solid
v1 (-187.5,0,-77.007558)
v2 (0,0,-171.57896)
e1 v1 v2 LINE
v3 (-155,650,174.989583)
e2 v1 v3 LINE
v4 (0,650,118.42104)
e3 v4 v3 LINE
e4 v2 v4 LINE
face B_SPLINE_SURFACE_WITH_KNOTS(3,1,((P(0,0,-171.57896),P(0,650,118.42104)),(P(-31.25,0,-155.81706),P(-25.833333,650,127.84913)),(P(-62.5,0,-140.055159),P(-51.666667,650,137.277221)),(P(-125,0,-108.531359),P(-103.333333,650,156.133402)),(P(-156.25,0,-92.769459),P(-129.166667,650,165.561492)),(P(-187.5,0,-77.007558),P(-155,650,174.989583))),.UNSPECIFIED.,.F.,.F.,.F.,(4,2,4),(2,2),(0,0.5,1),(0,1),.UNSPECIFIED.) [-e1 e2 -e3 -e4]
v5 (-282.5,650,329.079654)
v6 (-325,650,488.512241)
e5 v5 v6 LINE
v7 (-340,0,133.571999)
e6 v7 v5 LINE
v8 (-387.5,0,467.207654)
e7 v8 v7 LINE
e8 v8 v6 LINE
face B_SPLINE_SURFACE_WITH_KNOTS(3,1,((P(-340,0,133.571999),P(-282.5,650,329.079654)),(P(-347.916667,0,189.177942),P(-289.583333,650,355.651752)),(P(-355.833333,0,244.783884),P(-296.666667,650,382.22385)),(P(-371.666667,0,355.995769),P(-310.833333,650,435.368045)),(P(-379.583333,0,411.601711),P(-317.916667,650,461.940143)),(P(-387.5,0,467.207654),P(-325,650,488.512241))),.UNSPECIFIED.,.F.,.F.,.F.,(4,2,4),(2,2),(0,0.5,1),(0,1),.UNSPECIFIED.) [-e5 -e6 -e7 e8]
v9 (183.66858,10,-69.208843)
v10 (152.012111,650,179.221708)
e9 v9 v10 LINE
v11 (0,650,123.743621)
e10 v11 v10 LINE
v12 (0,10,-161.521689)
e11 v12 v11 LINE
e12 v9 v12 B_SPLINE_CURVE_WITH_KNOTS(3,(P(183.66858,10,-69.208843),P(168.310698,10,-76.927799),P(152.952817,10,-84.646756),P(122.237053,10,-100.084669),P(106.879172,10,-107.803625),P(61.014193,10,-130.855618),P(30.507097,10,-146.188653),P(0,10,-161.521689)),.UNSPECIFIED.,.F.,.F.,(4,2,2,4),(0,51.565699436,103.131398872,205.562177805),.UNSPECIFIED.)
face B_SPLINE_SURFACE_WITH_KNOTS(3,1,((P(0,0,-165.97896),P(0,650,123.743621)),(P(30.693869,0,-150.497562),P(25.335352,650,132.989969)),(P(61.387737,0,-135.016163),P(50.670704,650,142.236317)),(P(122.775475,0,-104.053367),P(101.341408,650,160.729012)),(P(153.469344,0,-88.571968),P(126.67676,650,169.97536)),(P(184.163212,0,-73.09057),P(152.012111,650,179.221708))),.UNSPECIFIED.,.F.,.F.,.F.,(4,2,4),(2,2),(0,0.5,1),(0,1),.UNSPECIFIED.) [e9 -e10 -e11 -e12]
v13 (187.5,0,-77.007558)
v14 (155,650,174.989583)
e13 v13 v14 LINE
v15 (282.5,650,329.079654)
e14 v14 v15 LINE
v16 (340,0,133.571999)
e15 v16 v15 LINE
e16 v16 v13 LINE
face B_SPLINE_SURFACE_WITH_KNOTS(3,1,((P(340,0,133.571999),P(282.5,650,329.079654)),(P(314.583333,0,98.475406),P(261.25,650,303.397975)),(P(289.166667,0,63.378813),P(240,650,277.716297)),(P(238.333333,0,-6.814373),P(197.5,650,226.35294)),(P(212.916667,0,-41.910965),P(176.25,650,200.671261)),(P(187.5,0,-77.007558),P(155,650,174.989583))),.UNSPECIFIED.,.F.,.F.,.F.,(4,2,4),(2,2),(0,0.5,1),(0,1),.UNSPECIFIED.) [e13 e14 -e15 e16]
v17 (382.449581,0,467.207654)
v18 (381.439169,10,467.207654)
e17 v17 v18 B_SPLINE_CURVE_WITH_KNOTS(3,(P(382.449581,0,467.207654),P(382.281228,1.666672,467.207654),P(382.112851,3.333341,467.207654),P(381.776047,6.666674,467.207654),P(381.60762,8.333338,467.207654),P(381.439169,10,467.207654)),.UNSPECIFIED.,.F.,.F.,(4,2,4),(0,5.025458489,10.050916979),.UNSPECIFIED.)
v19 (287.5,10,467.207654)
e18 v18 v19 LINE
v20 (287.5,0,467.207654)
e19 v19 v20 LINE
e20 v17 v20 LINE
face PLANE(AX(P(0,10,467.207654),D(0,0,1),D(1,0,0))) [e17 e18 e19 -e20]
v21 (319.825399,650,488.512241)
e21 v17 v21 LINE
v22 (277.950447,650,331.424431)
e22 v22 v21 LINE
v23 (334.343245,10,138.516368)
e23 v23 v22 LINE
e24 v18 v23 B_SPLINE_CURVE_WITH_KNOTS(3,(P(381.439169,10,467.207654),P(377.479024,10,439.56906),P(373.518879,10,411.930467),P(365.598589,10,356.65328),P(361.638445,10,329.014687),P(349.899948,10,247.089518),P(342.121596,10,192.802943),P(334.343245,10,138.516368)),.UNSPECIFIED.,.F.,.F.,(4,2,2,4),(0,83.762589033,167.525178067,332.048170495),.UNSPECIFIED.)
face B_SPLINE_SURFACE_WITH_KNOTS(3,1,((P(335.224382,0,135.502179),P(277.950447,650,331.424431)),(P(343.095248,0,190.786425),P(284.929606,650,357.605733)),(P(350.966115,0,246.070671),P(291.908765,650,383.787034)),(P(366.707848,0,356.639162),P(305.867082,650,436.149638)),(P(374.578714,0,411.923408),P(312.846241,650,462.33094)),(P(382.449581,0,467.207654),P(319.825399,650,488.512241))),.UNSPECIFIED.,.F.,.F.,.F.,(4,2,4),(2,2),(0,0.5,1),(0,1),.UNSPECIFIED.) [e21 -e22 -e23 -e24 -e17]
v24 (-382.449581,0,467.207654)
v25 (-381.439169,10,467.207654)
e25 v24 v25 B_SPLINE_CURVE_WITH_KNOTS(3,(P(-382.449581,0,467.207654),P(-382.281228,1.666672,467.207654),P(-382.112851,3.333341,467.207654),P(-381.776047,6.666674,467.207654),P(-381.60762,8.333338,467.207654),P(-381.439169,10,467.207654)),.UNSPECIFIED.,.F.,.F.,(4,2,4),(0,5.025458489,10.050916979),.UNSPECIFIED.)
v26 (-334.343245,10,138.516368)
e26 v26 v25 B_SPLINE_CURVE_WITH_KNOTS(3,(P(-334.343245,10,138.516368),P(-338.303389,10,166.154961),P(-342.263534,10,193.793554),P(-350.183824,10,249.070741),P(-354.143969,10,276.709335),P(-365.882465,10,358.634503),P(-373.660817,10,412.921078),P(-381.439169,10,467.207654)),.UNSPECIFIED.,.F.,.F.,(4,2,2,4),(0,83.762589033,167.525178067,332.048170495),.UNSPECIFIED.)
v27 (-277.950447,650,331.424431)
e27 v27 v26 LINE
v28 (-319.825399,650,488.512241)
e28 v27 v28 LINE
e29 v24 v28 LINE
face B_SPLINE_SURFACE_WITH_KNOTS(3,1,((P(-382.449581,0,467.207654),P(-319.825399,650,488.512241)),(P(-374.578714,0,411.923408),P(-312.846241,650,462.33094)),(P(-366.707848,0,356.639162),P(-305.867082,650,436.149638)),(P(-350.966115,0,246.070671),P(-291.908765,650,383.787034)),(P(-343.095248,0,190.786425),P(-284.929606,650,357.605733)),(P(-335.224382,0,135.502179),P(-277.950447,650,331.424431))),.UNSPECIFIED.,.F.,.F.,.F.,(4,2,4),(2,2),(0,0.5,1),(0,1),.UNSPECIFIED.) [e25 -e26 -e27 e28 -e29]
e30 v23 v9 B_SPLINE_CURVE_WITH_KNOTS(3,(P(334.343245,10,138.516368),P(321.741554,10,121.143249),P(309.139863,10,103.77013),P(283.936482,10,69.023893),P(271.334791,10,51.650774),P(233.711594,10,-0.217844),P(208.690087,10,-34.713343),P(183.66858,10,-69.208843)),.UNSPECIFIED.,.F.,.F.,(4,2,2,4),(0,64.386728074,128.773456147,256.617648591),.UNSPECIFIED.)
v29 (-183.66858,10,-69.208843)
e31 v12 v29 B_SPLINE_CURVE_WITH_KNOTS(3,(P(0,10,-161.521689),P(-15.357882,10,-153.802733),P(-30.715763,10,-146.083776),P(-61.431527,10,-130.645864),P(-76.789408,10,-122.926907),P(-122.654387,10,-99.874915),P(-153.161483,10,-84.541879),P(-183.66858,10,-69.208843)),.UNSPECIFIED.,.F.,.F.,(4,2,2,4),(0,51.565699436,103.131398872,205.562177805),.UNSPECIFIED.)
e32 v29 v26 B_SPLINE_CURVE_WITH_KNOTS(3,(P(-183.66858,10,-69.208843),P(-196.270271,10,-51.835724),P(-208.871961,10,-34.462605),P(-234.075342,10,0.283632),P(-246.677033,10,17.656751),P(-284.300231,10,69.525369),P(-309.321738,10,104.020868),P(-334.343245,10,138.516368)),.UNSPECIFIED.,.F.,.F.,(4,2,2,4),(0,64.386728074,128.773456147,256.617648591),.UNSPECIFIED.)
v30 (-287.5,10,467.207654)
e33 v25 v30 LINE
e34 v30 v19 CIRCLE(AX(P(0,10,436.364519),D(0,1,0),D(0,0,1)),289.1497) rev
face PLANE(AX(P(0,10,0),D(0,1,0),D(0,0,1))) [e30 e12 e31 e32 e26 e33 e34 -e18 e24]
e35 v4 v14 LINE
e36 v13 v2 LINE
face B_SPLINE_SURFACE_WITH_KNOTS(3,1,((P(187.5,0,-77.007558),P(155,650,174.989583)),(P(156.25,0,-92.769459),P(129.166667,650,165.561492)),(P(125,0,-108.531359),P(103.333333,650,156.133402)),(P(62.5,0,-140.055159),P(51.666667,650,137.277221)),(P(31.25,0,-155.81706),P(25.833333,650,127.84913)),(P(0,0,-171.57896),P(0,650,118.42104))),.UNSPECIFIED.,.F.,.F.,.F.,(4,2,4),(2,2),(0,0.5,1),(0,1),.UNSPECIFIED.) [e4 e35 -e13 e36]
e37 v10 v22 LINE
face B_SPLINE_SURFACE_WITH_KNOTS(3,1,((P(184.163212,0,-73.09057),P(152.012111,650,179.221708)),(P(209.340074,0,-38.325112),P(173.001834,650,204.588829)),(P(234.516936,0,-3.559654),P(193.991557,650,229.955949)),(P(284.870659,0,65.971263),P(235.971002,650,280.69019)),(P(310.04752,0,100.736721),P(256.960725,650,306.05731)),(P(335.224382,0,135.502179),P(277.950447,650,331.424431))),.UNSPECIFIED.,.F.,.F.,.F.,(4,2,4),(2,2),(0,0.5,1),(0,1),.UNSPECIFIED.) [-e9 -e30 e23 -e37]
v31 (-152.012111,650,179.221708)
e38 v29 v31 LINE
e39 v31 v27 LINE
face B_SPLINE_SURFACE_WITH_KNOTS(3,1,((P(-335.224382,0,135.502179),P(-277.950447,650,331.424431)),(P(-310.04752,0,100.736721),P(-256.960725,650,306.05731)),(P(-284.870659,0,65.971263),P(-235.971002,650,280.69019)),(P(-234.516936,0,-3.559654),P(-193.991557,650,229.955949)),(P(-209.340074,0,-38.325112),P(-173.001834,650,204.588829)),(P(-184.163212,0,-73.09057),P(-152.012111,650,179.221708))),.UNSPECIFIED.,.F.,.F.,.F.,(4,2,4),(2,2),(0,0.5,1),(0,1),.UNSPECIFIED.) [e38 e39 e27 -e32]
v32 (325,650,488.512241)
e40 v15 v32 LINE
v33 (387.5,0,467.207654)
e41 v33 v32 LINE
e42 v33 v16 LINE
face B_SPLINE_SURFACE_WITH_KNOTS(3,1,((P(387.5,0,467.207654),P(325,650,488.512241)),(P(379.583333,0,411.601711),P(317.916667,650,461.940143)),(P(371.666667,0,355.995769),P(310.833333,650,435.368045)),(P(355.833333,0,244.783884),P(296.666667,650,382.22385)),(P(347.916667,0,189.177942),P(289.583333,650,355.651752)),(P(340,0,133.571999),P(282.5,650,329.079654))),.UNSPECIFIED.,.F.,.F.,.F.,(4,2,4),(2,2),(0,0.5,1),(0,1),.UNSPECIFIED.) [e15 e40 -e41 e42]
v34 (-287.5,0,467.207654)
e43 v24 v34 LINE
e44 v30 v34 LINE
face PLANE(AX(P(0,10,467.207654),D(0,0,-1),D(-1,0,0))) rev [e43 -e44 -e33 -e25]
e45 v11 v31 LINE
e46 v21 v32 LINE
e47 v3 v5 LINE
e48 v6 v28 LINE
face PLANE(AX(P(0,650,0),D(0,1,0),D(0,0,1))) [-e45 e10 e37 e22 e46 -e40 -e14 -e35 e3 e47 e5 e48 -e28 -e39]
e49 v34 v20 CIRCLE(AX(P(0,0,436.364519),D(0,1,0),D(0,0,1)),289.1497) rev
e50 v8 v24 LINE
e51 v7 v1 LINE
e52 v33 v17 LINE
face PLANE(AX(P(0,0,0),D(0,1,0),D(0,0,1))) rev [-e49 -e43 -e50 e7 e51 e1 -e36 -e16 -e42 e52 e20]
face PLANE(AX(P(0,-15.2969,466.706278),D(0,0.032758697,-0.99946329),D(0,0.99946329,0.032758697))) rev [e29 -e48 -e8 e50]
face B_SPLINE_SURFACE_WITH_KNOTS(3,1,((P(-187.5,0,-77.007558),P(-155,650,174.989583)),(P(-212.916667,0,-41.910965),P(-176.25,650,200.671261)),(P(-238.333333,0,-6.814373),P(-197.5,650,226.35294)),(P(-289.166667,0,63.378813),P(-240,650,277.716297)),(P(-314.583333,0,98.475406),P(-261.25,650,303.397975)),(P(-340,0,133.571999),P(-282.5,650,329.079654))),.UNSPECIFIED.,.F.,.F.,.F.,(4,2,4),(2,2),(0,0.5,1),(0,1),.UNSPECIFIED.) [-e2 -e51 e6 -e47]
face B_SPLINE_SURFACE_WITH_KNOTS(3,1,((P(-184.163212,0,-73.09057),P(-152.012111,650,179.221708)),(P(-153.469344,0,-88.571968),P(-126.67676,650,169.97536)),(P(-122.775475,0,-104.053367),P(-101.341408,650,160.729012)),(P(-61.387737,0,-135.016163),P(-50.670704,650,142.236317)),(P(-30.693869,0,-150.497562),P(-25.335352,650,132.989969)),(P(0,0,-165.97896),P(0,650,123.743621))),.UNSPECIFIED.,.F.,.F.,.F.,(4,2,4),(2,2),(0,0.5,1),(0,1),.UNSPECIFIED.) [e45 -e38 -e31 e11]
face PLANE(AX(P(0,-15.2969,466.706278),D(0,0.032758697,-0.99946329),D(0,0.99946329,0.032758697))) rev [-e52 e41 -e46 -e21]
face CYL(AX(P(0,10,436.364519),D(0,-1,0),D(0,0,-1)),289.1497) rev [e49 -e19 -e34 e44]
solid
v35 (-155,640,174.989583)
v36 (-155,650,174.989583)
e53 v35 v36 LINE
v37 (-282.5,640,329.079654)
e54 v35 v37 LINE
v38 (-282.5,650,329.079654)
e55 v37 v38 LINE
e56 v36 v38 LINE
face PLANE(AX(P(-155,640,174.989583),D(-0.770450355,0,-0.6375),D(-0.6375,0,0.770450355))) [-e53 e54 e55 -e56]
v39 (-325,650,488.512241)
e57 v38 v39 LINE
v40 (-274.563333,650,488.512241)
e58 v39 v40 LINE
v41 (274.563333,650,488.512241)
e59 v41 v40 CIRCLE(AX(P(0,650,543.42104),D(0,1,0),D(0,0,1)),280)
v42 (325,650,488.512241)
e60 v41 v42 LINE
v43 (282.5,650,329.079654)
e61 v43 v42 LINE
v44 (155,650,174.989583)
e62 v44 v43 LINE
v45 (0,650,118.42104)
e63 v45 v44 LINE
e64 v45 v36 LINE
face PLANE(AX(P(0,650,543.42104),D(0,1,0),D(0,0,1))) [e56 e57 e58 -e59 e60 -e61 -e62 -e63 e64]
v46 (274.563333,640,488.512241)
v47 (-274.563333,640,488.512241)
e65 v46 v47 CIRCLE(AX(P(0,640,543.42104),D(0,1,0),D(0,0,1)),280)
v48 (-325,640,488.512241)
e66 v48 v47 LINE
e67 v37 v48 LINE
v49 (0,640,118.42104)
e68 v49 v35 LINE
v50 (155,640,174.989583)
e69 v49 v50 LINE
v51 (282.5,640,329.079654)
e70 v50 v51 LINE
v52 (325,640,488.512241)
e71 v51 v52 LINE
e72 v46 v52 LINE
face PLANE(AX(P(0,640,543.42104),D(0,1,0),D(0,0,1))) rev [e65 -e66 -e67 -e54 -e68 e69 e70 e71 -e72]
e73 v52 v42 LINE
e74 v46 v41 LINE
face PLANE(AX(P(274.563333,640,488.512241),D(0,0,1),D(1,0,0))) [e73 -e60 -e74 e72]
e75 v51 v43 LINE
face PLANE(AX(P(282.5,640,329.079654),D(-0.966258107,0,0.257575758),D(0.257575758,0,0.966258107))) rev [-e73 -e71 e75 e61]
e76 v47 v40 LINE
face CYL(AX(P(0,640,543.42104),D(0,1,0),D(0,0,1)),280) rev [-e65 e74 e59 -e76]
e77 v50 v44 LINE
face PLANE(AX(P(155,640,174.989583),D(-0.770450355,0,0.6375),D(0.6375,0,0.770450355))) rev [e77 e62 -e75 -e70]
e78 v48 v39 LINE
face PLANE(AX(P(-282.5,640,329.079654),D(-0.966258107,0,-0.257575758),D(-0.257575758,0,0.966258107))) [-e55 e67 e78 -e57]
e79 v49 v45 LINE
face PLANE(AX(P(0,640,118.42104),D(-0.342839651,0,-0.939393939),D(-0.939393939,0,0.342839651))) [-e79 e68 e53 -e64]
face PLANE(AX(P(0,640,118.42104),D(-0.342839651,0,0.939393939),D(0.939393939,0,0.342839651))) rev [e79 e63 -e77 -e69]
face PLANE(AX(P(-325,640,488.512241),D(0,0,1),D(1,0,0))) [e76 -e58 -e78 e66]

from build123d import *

# Parameters (mm, degrees)
BOSS_EXTRUDE1_DEPTH = 10
BOSS_EXTRUDE2_DEPTH = 10


with BuildPart() as part:
    # Loft2: read off the stored shape, not the designer's step
    # Loft2: loft between two sections, ruled curve by curve
    loft2_from = [
        Edge.make_bspline([(-335.224381982, 0, 135.502179225), (-310.047520364, 0, 100.736721017), (-284.870658745, 0, 65.97126281), (-234.516935508, 0, -3.559653606), (-209.34007389, 0, -38.325111813), (-184.163212271, 0, -73.090570021)], [0, 0, 0, 0, 0.5, 0.5, 1, 1, 1, 1], 3),
        Edge.make_bspline([(-184.163212271, 0, -73.090570021), (-153.469343559, 0, -88.571968338), (-122.775474847, 0, -104.053366656), (-61.387737424, 0, -135.01616329), (-30.693868712, 0, -150.497561608), (0, 0, -165.978959925)], [0, 0, 0, 0, 0.5, 0.5, 1, 1, 1, 1], 3),
        Edge.make_bspline([(-382.449580547, 0, 467.207653654), (-374.57871412, 0, 411.923407915), (-366.707847692, 0, 356.639162177), (-350.966114837, 0, 246.070670701), (-343.09524841, 0, 190.786424963), (-335.224381982, 0, 135.502179225)], [0, 0, 0, 0, 0.5, 0.5, 1, 1, 1, 1], 3),
        Edge.make_bspline([(0, 0, -165.978959925), (30.693868712, 0, -150.497561608), (61.387737424, 0, -135.01616329), (122.775474847, 0, -104.053366656), (153.469343559, 0, -88.571968338), (184.163212271, 0, -73.090570021)], [0, 0, 0, 0, 0.5, 0.5, 1, 1, 1, 1], 3),
        Edge.make_bspline([(184.163212271, 0, -73.090570021), (209.34007389, 0, -38.325111813), (234.516935508, 0, -3.559653606), (284.870658745, 0, 65.97126281), (310.047520364, 0, 100.736721017), (335.224381982, 0, 135.502179225)], [0, 0, 0, 0, 0.5, 0.5, 1, 1, 1, 1], 3),
        Edge.make_bspline([(335.224381982, 0, 135.502179225), (343.09524841, 0, 190.786424963), (350.966114837, 0, 246.070670701), (366.707847692, 0, 356.639162177), (374.57871412, 0, 411.923407915), (382.449580547, 0, 467.207653654)], [0, 0, 0, 0, 0.5, 0.5, 1, 1, 1, 1], 3),
        Edge.make_bspline([(387.5, 0, 467.207653654), (379.583333333, 0, 411.601711225), (371.666666667, 0, 355.995768797), (355.833333333, 0, 244.783883941), (347.916666667, 0, 189.177941512), (340, 0, 133.571999084)], [0, 0, 0, 0, 0.5, 0.5, 1, 1, 1, 1], 3),
        Edge.make_bspline([(340, 0, 133.571999084), (314.583333333, 0, 98.475406182), (289.166666667, 0, 63.37881328), (238.333333333, 0, -6.814372524), (212.916666667, 0, -41.910965426), (187.5, 0, -77.007558328)], [0, 0, 0, 0, 0.5, 0.5, 1, 1, 1, 1], 3),
        Edge.make_bspline([(187.5, 0, -77.007558328), (156.25, 0, -92.769458594), (125, 0, -108.531358861), (62.5, 0, -140.055159393), (31.25, 0, -155.817059659), (0, 0, -171.578959925)], [0, 0, 0, 0, 0.5, 0.5, 1, 1, 1, 1], 3),
        Edge.make_bspline([(0, 0, -171.578959925), (-31.25, 0, -155.817059659), (-62.5, 0, -140.055159393), (-125, 0, -108.531358861), (-156.25, 0, -92.769458594), (-187.5, 0, -77.007558328)], [0, 0, 0, 0, 0.5, 0.5, 1, 1, 1, 1], 3),
        Edge.make_bspline([(-187.5, 0, -77.007558328), (-212.916666667, 0, -41.910965426), (-238.333333333, 0, -6.814372524), (-289.166666667, 0, 63.37881328), (-314.583333333, 0, 98.475406182), (-340, 0, 133.571999084)], [0, 0, 0, 0, 0.5, 0.5, 1, 1, 1, 1], 3),
        Edge.make_bspline([(-340, 0, 133.571999084), (-347.916666667, 0, 189.177941512), (-355.833333333, 0, 244.783883941), (-371.666666667, 0, 355.995768797), (-379.583333333, 0, 411.601711225), (-387.5, 0, 467.207653654)], [0, 0, 0, 0, 0.5, 0.5, 1, 1, 1, 1], 3),
        Edge.make_line((387.5, 0, 467.207653654), (382.449580547, 0, 467.207653654)),
        Edge.make_line((-382.449580547, 0, 467.207653654), (-387.5, 0, 467.207653654)),
    ]
    loft2_to = [
        Edge.make_bspline([(-277.950447238, 650, 331.424430821), (-256.960724605, 650, 306.057310412), (-235.971001972, 650, 280.690190004), (-193.991556706, 650, 229.955949187), (-173.001834073, 650, 204.588828778), (-152.012111441, 650, 179.22170837)], [0, 0, 0, 0, 0.5, 0.5, 1, 1, 1, 1], 3),
        Edge.make_bspline([(-152.012111441, 650, 179.22170837), (-126.676759534, 650, 169.975360428), (-101.341407627, 650, 160.729012487), (-50.670703814, 650, 142.236316603), (-25.335351907, 650, 132.989968662), (0, 650, 123.74362072)], [0, 0, 0, 0, 0.5, 0.5, 1, 1, 1, 1], 3),
        Edge.make_bspline([(-319.825399172, 650, 488.512241267), (-312.846240516, 650, 462.330939526), (-305.86708186, 650, 436.149637785), (-291.908764549, 650, 383.787034303), (-284.929605893, 650, 357.605732562), (-277.950447238, 650, 331.424430821)], [0, 0, 0, 0, 0.5, 0.5, 1, 1, 1, 1], 3),
        Edge.make_bspline([(0, 650, 123.74362072), (25.335351907, 650, 132.989968662), (50.670703814, 650, 142.236316603), (101.341407627, 650, 160.729012487), (126.676759534, 650, 169.975360428), (152.012111441, 650, 179.22170837)], [0, 0, 0, 0, 0.5, 0.5, 1, 1, 1, 1], 3),
        Edge.make_bspline([(152.012111441, 650, 179.22170837), (173.001834073, 650, 204.588828778), (193.991556706, 650, 229.955949187), (235.971001972, 650, 280.690190004), (256.960724605, 650, 306.057310412), (277.950447238, 650, 331.424430821)], [0, 0, 0, 0, 0.5, 0.5, 1, 1, 1, 1], 3),
        Edge.make_bspline([(277.950447238, 650, 331.424430821), (284.929605893, 650, 357.605732562), (291.908764549, 650, 383.787034303), (305.86708186, 650, 436.149637785), (312.846240516, 650, 462.330939526), (319.825399172, 650, 488.512241267)], [0, 0, 0, 0, 0.5, 0.5, 1, 1, 1, 1], 3),
        Edge.make_bspline([(325, 650, 488.512241267), (317.916666667, 650, 461.940143328), (310.833333333, 650, 435.368045389), (296.666666667, 650, 382.22384951), (289.583333333, 650, 355.651751571), (282.5, 650, 329.079653632)], [0, 0, 0, 0, 0.5, 0.5, 1, 1, 1, 1], 3),
        Edge.make_bspline([(282.5, 650, 329.079653632), (261.25, 650, 303.397975122), (240, 650, 277.716296611), (197.5, 650, 226.35293959), (176.25, 650, 200.67126108), (155, 650, 174.98958257)], [0, 0, 0, 0, 0.5, 0.5, 1, 1, 1, 1], 3),
        Edge.make_bspline([(155, 650, 174.98958257), (129.166666667, 650, 165.561492154), (103.333333333, 650, 156.133401738), (51.666666667, 650, 137.277220906), (25.833333333, 650, 127.849130491), (0, 650, 118.421040075)], [0, 0, 0, 0, 0.5, 0.5, 1, 1, 1, 1], 3),
        Edge.make_bspline([(0, 650, 118.421040075), (-25.833333333, 650, 127.849130491), (-51.666666667, 650, 137.277220906), (-103.333333333, 650, 156.133401738), (-129.166666667, 650, 165.561492154), (-155, 650, 174.98958257)], [0, 0, 0, 0, 0.5, 0.5, 1, 1, 1, 1], 3),
        Edge.make_bspline([(-155, 650, 174.98958257), (-176.25, 650, 200.67126108), (-197.5, 650, 226.35293959), (-240, 650, 277.716296611), (-261.25, 650, 303.397975122), (-282.5, 650, 329.079653632)], [0, 0, 0, 0, 0.5, 0.5, 1, 1, 1, 1], 3),
        Edge.make_bspline([(-282.5, 650, 329.079653632), (-289.583333333, 650, 355.651751571), (-296.666666667, 650, 382.22384951), (-310.833333333, 650, 435.368045389), (-317.916666667, 650, 461.940143328), (-325, 650, 488.512241267)], [0, 0, 0, 0, 0.5, 0.5, 1, 1, 1, 1], 3),
        Edge.make_line((325, 650, 488.512241267), (319.825399172, 650, 488.512241267)),
        Edge.make_line((-319.825399172, 650, 488.512241267), (-325, 650, 488.512241267)),
    ]
    loft2 = Solid(Shell([*[Face.make_surface_from_curves(loft2_from[k], loft2_to[k]) for k in range(14)], Face(Wire(loft2_from)), Face(Wire(loft2_to))]))
    add(loft2)

    # Sketch1<271> → Boss-Extrude1 (add)
    with BuildSketch(Plane(origin=(0, 0, 0), x_dir=(1, 0, 0), z_dir=(0, 1, 0))):
        with BuildLine():
            Line((-381.737726173, -462.207653654), (-382.449580547, -467.207653654))
            Line((-382.449580547, -467.207653654), (-287.5, -467.207653654))
            ThreePointArc((-287.5, -467.207653654), (0, -147.214818982), (287.5, -467.207653654))
            Line((287.5, -467.207653654), (382.449580547, -467.207653654))
            Line((382.449580547, -467.207653654), (381.737726173, -462.207653654))
            Line((381.737726173, -462.207653654), (335.224381982, -135.502179225))
            Line((335.224381982, -135.502179225), (184.163212271, 73.090570021))
            Line((184.163212271, 73.090570021), (0, 165.978959925))
            Line((0, 165.978959925), (-184.163212271, 73.090570021))
            Line((-184.163212271, 73.090570021), (-335.224381982, -135.502179225))
            Line((-335.224381982, -135.502179225), (-381.737726173, -462.207653654))
        make_face()
    extrude(amount=BOSS_EXTRUDE1_DEPTH)


with BuildPart() as body_2:
    # Sketch2<164> → Boss-Extrude2 (new body)
    with BuildSketch(Plane(origin=(0, 650, 0), x_dir=(1, 0, 0), z_dir=(0, 1, 0))):
        with BuildLine():
            Line((0, -118.421040075), (-155, -174.98958257))
            Line((-155, -174.98958257), (-282.5, -329.079653632))
            Line((-282.5, -329.079653632), (-325, -488.512241267))
            Line((-325, -488.512241267), (-274.563332973, -488.512241267))
            ThreePointArc((-274.563332973, -488.512241267), (0, -263.421040075), (274.563332973, -488.512241267))
            Line((274.563332973, -488.512241267), (325, -488.512241267))
            Line((325, -488.512241267), (282.5, -329.079653632))
            Line((282.5, -329.079653632), (155, -174.98958257))
            Line((155, -174.98958257), (0, -118.421040075))
        make_face()
    extrude(amount=-BOSS_EXTRUDE2_DEPTH)


solid = Compound([part.part, body_2.part])
